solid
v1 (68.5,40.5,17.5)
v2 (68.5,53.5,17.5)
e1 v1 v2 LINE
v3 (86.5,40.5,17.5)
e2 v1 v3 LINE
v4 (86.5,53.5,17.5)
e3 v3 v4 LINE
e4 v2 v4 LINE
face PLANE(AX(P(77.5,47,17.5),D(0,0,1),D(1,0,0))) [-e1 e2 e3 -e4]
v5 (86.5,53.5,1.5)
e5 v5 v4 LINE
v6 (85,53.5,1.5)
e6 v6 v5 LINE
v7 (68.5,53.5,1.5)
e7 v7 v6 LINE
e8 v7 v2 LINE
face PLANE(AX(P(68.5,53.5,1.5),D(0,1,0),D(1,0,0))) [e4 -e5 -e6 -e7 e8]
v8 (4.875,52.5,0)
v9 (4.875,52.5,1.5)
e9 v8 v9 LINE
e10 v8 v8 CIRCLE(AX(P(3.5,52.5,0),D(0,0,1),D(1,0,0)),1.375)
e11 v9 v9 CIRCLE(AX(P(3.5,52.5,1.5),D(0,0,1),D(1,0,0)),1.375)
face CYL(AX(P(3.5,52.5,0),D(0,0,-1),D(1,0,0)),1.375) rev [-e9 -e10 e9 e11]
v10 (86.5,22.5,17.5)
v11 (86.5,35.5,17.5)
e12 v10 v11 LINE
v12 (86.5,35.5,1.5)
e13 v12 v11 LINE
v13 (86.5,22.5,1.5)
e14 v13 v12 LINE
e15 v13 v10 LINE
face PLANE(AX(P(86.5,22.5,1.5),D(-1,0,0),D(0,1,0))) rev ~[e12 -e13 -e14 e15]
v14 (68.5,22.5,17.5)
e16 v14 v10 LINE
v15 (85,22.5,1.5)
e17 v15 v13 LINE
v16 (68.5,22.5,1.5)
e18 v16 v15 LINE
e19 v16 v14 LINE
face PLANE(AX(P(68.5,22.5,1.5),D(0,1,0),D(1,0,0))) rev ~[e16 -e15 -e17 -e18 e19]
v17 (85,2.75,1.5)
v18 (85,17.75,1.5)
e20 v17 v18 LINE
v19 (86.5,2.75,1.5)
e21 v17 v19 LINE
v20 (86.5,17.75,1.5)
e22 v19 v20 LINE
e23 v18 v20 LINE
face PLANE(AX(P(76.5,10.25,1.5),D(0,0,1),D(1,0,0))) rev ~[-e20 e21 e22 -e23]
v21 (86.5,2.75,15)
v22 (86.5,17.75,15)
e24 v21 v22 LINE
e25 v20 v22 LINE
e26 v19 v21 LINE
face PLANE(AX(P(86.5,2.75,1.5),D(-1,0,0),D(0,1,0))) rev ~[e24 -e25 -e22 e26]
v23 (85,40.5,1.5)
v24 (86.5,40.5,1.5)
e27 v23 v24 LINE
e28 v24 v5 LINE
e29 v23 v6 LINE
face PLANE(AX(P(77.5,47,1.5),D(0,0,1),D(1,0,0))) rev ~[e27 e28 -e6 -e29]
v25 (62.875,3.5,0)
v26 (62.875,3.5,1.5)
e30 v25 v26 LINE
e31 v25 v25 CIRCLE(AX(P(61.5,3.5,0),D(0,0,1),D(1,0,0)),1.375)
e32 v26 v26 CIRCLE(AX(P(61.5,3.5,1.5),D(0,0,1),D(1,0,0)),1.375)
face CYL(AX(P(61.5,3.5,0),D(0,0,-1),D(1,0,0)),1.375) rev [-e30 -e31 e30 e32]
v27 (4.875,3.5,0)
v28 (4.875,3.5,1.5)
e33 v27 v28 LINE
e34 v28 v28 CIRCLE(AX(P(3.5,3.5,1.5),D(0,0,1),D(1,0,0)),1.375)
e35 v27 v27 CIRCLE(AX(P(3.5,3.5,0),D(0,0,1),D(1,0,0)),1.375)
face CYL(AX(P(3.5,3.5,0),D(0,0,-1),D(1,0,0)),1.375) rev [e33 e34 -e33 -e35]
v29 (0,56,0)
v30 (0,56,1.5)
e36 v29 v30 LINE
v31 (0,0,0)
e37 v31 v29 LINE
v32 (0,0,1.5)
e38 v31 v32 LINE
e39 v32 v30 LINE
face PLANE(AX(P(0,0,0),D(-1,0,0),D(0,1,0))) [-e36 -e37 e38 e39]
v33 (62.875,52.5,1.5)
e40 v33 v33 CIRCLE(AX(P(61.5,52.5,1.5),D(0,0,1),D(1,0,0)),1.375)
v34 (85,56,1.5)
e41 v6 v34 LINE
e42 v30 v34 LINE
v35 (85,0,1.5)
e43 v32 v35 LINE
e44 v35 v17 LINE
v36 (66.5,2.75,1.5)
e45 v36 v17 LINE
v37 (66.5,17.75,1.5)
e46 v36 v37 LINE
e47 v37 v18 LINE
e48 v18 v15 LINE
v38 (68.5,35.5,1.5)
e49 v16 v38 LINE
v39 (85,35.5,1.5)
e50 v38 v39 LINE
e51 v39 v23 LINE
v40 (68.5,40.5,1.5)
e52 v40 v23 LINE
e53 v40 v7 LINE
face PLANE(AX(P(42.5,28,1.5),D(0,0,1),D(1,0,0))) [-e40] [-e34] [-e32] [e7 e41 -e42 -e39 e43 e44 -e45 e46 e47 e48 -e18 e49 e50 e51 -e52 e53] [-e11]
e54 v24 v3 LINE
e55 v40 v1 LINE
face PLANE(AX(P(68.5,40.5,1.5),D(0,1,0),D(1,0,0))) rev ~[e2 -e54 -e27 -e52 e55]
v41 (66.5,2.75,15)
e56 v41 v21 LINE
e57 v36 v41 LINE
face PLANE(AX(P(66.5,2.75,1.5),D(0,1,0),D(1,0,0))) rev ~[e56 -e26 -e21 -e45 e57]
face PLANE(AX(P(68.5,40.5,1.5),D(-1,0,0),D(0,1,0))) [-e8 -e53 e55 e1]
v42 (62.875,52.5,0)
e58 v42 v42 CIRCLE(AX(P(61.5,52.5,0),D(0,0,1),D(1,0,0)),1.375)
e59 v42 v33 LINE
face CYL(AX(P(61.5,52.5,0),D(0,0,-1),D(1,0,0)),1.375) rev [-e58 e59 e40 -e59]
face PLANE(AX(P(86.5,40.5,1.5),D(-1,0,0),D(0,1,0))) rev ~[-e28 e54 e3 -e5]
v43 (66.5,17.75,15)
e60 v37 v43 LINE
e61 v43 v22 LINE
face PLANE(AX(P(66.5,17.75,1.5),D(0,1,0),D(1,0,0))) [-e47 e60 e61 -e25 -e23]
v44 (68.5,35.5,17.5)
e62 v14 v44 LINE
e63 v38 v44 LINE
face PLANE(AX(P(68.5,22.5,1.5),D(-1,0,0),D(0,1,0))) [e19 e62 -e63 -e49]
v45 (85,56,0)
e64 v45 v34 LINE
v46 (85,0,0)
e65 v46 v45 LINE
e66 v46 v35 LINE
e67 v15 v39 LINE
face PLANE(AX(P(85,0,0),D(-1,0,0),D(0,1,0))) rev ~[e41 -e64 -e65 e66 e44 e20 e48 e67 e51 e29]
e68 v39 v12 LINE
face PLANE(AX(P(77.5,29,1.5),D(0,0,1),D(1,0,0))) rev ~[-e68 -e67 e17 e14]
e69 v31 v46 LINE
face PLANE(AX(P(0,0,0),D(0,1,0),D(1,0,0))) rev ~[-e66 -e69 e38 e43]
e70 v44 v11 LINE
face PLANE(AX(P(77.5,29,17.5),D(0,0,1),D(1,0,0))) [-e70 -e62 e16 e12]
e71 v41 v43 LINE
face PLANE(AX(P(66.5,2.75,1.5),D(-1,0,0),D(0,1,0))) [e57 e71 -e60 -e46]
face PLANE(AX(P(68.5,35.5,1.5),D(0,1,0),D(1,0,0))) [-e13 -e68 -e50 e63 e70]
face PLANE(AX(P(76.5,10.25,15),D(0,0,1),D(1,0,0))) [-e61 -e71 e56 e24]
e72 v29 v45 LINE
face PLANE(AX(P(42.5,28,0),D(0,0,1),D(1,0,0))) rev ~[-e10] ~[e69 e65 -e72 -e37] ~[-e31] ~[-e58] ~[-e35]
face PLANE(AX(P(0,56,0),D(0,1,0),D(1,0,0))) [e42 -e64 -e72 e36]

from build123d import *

# Parameters (mm, degrees)
F0_W     = 85
F0_H     = 56
F0_R     = 1.375
F1_DEPTH = 1.5
F3_W     = 18
F3_H     = 13
F4_DEPTH = 16
F3_W_2   = 20
F3_H_2   = 15
F5_DEPTH = 13.5


# Not quite as in the source:
# - a feature names something its author has since deleted; it is built from what else it names


with BuildPart() as f1:
    # F0 (on Top) → F1 (new body)
    with BuildSketch(Plane.XY):
        with Locations((42.5, 28)):
            Rectangle(F0_W, F0_H)
        with Locations((3.5, 3.5)):
            Circle(F0_R, mode=Mode.SUBTRACT)
        with Locations((61.5, 3.5)):
            Circle(F0_R, mode=Mode.SUBTRACT)
        with Locations((3.5, 52.5)):
            Circle(F0_R, mode=Mode.SUBTRACT)
        with Locations((61.5, 52.5)):
            Circle(F0_R, mode=Mode.SUBTRACT)
    extrude(amount=F1_DEPTH)

    # F3 (on offset) → F4 (join)
    with BuildSketch(Plane.XY.offset(1.5)):
        with Locations((77.5, 47)):
            Rectangle(F3_W, F3_H)
        with Locations((77.5, 29)):
            Rectangle(F3_W, F3_H)
    extrude(amount=F4_DEPTH)

    # F3 (on offset) → F5 (join)
    with BuildSketch(Plane.XY.offset(1.5)):
        with Locations((76.5, 10.25)):
            Rectangle(F3_W_2, F3_H_2)
    extrude(amount=F5_DEPTH)


solid = f1.part
